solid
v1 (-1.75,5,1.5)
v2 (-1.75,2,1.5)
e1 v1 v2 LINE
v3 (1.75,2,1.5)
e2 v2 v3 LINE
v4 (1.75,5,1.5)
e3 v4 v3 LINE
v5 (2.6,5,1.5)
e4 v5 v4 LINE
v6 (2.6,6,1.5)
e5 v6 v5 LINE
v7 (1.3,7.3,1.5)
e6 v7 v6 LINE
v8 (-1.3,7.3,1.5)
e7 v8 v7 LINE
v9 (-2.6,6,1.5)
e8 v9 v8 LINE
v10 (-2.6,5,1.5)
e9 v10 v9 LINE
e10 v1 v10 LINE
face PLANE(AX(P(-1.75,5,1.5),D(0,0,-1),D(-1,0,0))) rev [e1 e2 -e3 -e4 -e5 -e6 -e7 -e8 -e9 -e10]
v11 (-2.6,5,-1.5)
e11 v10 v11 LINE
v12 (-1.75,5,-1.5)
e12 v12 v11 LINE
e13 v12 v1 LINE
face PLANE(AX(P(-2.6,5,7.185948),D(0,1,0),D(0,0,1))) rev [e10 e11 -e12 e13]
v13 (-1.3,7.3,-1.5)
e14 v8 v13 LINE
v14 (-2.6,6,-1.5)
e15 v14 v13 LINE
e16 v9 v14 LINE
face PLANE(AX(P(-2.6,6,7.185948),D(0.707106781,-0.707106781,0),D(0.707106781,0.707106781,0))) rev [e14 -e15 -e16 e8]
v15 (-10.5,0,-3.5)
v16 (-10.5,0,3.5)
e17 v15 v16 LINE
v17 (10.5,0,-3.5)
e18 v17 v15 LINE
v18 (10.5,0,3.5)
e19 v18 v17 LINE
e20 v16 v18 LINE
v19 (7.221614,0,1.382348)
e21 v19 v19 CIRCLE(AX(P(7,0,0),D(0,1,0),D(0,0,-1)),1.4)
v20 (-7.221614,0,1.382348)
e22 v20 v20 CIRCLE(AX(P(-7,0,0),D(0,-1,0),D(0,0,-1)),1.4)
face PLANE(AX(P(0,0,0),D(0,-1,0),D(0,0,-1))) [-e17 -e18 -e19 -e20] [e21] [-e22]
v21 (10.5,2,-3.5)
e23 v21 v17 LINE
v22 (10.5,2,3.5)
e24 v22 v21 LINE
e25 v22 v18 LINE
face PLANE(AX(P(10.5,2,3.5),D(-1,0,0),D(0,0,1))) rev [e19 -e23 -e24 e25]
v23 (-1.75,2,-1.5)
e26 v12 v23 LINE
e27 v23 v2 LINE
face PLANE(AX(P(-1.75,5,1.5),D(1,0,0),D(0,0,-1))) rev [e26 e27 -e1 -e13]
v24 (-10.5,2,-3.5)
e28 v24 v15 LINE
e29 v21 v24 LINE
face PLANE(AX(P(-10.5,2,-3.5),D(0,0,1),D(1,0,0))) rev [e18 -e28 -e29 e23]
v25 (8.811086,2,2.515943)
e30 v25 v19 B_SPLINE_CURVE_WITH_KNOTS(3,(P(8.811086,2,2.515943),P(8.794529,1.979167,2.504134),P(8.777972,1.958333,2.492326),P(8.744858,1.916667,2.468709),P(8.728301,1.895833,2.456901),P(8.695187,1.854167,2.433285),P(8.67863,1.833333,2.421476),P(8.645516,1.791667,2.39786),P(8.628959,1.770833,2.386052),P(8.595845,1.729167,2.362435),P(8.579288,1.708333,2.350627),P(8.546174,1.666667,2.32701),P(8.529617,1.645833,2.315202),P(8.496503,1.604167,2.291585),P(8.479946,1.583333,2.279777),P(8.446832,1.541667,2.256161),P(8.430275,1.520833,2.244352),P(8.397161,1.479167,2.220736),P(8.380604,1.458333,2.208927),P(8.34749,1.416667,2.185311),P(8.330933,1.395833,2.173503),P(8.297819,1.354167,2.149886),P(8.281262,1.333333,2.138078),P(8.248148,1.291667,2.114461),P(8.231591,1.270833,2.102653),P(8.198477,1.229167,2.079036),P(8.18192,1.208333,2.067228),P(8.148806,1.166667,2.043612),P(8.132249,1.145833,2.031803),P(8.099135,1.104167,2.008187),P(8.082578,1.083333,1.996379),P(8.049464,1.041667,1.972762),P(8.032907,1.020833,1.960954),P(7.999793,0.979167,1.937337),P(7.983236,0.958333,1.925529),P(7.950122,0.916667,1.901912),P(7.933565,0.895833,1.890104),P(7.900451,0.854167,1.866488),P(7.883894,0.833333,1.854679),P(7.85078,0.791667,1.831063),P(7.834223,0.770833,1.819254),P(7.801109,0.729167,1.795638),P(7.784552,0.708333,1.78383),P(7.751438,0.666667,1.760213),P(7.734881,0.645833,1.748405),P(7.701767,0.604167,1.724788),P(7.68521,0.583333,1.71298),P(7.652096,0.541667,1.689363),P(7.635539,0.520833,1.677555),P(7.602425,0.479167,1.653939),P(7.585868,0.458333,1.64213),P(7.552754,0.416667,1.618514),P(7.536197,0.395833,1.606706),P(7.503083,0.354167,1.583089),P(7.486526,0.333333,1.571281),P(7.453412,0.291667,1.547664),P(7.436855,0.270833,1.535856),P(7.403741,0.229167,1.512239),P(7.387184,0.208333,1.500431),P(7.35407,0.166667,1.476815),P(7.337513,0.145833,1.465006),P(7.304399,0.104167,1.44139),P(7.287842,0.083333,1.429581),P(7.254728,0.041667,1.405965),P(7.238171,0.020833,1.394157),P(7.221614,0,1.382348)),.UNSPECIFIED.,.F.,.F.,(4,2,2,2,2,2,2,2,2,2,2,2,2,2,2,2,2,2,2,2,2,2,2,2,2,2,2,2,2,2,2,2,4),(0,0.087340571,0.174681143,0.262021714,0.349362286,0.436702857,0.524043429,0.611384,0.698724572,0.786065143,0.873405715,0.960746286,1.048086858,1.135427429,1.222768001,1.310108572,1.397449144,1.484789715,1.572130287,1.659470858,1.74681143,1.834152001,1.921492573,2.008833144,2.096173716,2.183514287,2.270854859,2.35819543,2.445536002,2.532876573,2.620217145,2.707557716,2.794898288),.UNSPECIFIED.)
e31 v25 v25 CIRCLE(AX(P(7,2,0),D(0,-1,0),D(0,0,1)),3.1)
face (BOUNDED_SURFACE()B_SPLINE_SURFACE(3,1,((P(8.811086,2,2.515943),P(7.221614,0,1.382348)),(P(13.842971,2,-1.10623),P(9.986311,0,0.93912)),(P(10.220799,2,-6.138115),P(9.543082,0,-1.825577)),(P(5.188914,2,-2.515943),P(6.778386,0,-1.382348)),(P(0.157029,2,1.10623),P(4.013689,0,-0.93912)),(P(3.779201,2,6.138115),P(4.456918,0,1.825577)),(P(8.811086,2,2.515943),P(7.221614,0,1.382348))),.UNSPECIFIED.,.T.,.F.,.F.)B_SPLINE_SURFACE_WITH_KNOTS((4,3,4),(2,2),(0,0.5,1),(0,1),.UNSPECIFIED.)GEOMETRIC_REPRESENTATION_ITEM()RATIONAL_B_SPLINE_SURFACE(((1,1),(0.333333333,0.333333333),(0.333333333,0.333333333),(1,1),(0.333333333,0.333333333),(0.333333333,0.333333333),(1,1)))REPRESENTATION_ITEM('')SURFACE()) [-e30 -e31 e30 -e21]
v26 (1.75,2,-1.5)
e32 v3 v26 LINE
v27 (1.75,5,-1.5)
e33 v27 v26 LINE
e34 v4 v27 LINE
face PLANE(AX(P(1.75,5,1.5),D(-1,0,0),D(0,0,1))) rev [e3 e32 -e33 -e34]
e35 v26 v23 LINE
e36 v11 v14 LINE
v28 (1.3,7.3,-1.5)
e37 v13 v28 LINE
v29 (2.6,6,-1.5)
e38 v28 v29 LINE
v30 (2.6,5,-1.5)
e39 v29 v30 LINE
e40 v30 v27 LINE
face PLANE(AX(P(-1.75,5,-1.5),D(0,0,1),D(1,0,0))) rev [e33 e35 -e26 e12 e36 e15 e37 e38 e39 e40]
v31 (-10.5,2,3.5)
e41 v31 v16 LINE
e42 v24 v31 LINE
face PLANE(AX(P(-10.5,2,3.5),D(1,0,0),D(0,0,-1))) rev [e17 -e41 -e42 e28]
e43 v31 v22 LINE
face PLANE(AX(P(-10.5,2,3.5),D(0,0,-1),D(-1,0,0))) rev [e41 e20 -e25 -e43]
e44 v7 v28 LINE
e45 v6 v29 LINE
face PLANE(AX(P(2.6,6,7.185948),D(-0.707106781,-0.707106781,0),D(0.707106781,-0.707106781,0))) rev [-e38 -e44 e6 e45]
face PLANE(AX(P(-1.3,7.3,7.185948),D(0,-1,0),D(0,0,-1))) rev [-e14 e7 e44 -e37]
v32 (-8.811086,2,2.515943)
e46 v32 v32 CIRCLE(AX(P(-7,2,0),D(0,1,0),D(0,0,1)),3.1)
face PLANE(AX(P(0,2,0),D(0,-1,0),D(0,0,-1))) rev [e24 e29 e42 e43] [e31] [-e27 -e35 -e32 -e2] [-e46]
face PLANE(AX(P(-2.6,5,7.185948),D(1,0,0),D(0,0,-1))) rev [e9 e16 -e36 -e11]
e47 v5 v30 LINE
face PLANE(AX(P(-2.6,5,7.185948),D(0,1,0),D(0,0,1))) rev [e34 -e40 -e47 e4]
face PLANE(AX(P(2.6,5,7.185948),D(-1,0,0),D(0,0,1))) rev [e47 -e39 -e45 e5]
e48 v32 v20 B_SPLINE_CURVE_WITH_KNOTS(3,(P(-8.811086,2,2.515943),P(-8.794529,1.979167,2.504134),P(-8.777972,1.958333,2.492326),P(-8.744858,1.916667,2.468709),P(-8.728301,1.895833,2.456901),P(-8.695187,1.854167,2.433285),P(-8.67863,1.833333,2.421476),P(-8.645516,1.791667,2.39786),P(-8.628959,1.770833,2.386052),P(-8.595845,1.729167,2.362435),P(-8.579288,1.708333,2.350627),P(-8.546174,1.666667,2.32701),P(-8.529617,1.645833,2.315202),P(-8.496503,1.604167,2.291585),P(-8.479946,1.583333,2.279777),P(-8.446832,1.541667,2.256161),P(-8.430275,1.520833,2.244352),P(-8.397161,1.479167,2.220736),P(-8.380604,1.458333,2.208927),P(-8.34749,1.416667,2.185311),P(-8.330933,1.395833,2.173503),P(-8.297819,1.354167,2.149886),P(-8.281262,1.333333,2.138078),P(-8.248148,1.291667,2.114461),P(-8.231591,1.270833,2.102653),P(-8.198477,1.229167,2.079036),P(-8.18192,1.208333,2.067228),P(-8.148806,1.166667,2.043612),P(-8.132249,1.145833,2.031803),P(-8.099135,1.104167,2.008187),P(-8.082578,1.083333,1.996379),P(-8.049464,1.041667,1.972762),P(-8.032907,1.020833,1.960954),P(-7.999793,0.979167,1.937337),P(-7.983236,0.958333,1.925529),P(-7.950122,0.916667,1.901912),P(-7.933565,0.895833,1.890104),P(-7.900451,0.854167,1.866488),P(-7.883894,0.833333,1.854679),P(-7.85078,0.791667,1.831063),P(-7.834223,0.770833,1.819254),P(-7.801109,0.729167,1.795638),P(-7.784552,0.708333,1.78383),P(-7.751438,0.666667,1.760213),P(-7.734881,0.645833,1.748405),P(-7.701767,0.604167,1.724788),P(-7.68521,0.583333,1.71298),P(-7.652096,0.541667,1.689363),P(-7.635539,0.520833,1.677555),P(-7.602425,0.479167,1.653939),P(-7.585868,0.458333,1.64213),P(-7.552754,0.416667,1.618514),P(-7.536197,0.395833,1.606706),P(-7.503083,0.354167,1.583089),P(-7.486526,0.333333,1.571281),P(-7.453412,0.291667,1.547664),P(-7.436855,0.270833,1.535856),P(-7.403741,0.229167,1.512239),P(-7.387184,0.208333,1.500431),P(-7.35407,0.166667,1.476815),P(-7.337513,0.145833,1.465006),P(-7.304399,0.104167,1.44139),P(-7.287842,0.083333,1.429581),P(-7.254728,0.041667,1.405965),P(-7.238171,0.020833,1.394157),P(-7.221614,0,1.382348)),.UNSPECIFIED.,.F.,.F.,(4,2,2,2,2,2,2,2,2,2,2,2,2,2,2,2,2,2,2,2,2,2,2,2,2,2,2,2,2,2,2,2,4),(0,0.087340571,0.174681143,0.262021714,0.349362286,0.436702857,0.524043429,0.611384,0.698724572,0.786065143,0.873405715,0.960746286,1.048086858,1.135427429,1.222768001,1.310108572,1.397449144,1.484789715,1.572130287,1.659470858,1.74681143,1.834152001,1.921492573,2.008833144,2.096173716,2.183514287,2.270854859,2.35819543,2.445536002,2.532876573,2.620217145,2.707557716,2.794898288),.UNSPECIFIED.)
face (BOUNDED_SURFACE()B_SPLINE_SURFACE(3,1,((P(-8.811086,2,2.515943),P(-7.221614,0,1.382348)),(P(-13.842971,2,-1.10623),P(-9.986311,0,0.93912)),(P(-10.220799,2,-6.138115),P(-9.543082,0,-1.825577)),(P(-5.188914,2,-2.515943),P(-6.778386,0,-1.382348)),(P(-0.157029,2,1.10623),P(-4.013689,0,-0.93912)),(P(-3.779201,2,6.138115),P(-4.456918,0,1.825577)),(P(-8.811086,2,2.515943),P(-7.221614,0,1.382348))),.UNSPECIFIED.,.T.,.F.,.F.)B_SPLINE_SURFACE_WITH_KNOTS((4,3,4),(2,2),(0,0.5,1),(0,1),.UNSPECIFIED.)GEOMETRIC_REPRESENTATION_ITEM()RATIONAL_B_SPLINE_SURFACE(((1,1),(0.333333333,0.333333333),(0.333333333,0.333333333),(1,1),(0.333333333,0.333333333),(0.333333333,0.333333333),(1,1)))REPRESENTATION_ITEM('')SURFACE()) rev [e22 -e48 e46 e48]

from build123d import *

# Parameters (mm, degrees)
SKETCH1_W                       = 21
SKETCH1_H                       = 7
BOSS_EXTRUDE1_DEPTH             = 2
SKETCH4_W                       = 3.5
SKETCH4_H                       = 3
BOSS_EXTRUDE2_DEPTH             = 3
BOSS_EXTRUDE3_REACH             = 14.145
BOSS_EXTRUDE3_DIRECTION_2_REACH = 14.145


with BuildPart() as part:
    # Sketch1 → Boss-Extrude1 (new body)
    with BuildSketch(Plane(origin=(0, 0, 0), x_dir=(1, 0, 0), z_dir=(0, 1, 0))):
        Rectangle(SKETCH1_W, SKETCH1_H)
    extrude(amount=BOSS_EXTRUDE1_DEPTH)

    # Cut-Loft1: read off the stored shape, not the designer's step
    # Cut-Loft1: loft between two sections, ruled curve by curve
    cut_loft1_from = [
        Edge.make_bspline([(-8.811086142, 2, 2.515942564), (-13.842971271, 2, -1.106229719), (-10.220798987, 2, -6.138114848), (-5.188913858, 2, -2.515942564), (-0.157028729, 2, 1.106229719), (-3.779201013, 2, 6.138114848), (-8.811086142, 2, 2.515942564)], [0, 0, 0, 0, 0.5, 0.5, 0.5, 1, 1, 1, 1], 3, [1, 0.333333333, 0.333333333, 1, 0.333333333, 0.333333333, 1]),
    ]
    cut_loft1_to = [
        Edge.make_bspline([(-7.221614309, 0, 1.3823484), (-9.986311108, 0, 0.939119783), (-9.543082491, 0, -1.825577017), (-6.778385691, 0, -1.3823484), (-4.013688892, 0, -0.939119783), (-4.456917509, 0, 1.825577017), (-7.221614309, 0, 1.3823484)], [0, 0, 0, 0, 0.5, 0.5, 0.5, 1, 1, 1, 1], 3, [1, 0.333333333, 0.333333333, 1, 0.333333333, 0.333333333, 1]),
    ]
    cut_loft1 = Solid(Shell([*[Face.make_surface_from_curves(cut_loft1_from[k], cut_loft1_to[k]) for k in range(1)], Face(Wire(cut_loft1_from)), Face(Wire(cut_loft1_to))]))
    add(cut_loft1, mode=Mode.SUBTRACT)

    # Mirror1: Cut-Loft1 across plane
    add(cut_loft1.mirror(Plane(origin=(0, 0, 0), x_dir=(0, 0, 1), z_dir=(1, 0, 0))), mode=Mode.SUBTRACT)

    # Sketch4 → Boss-Extrude2 (add)
    with BuildSketch(Plane(origin=(0, 2, 0), x_dir=(1, 0, 0), z_dir=(0, 1, 0))):
        Rectangle(SKETCH4_W, SKETCH4_H)
    extrude(amount=BOSS_EXTRUDE2_DEPTH)

    # Boss-Extrude3: up to this face of the body (flat: up to its plane)
    boss_extrude3_end = Plane(part.part.faces().sort_by_distance((0, 3.5, 1.5))[0])
    # Sketch5 → Boss-Extrude3 (add, up to the picked face)
    with BuildSketch(Plane.XY, mode=Mode.PRIVATE) as boss_extrude3_sk1:
        Polygon((-2.6, 5), (-2.6, 6), (-1.3, 7.3), (1.3, 7.3), (2.6, 6), (2.6, 5), align=None)
    boss_extrude3_tool1 = split(extrude(boss_extrude3_sk1.sketch, amount=BOSS_EXTRUDE3_REACH, mode=Mode.PRIVATE), bisect_by=boss_extrude3_end, keep=Keep.BOTH, mode=Mode.PRIVATE)
    add(boss_extrude3_tool1.solids().sort_by(Axis((0, 6.032068, 0), (0, 0, 1)))[0])

    # Boss-Extrude3 direction 2: up to this face of the body (flat: up to its plane)
    boss_extrude3_direction_2_end = Plane(part.part.faces().sort_by_distance((0, 3.5, -1.5))[0])
    # Sketch5 → Boss-Extrude3 direction 2 (add, up to the picked face)
    with BuildSketch(Plane.XY, mode=Mode.PRIVATE) as boss_extrude3_direction_2_sk1:
        Polygon((-2.6, 5), (-2.6, 6), (-1.3, 7.3), (1.3, 7.3), (2.6, 6), (2.6, 5), align=None)
    boss_extrude3_direction_2_tool1 = split(extrude(boss_extrude3_direction_2_sk1.sketch, amount=-BOSS_EXTRUDE3_DIRECTION_2_REACH, mode=Mode.PRIVATE), bisect_by=boss_extrude3_direction_2_end, keep=Keep.BOTH, mode=Mode.PRIVATE)
    add(boss_extrude3_direction_2_tool1.solids().sort_by(Axis((0, 6.032068, 0), (0, 0, -1)))[0])


solid = part.part
